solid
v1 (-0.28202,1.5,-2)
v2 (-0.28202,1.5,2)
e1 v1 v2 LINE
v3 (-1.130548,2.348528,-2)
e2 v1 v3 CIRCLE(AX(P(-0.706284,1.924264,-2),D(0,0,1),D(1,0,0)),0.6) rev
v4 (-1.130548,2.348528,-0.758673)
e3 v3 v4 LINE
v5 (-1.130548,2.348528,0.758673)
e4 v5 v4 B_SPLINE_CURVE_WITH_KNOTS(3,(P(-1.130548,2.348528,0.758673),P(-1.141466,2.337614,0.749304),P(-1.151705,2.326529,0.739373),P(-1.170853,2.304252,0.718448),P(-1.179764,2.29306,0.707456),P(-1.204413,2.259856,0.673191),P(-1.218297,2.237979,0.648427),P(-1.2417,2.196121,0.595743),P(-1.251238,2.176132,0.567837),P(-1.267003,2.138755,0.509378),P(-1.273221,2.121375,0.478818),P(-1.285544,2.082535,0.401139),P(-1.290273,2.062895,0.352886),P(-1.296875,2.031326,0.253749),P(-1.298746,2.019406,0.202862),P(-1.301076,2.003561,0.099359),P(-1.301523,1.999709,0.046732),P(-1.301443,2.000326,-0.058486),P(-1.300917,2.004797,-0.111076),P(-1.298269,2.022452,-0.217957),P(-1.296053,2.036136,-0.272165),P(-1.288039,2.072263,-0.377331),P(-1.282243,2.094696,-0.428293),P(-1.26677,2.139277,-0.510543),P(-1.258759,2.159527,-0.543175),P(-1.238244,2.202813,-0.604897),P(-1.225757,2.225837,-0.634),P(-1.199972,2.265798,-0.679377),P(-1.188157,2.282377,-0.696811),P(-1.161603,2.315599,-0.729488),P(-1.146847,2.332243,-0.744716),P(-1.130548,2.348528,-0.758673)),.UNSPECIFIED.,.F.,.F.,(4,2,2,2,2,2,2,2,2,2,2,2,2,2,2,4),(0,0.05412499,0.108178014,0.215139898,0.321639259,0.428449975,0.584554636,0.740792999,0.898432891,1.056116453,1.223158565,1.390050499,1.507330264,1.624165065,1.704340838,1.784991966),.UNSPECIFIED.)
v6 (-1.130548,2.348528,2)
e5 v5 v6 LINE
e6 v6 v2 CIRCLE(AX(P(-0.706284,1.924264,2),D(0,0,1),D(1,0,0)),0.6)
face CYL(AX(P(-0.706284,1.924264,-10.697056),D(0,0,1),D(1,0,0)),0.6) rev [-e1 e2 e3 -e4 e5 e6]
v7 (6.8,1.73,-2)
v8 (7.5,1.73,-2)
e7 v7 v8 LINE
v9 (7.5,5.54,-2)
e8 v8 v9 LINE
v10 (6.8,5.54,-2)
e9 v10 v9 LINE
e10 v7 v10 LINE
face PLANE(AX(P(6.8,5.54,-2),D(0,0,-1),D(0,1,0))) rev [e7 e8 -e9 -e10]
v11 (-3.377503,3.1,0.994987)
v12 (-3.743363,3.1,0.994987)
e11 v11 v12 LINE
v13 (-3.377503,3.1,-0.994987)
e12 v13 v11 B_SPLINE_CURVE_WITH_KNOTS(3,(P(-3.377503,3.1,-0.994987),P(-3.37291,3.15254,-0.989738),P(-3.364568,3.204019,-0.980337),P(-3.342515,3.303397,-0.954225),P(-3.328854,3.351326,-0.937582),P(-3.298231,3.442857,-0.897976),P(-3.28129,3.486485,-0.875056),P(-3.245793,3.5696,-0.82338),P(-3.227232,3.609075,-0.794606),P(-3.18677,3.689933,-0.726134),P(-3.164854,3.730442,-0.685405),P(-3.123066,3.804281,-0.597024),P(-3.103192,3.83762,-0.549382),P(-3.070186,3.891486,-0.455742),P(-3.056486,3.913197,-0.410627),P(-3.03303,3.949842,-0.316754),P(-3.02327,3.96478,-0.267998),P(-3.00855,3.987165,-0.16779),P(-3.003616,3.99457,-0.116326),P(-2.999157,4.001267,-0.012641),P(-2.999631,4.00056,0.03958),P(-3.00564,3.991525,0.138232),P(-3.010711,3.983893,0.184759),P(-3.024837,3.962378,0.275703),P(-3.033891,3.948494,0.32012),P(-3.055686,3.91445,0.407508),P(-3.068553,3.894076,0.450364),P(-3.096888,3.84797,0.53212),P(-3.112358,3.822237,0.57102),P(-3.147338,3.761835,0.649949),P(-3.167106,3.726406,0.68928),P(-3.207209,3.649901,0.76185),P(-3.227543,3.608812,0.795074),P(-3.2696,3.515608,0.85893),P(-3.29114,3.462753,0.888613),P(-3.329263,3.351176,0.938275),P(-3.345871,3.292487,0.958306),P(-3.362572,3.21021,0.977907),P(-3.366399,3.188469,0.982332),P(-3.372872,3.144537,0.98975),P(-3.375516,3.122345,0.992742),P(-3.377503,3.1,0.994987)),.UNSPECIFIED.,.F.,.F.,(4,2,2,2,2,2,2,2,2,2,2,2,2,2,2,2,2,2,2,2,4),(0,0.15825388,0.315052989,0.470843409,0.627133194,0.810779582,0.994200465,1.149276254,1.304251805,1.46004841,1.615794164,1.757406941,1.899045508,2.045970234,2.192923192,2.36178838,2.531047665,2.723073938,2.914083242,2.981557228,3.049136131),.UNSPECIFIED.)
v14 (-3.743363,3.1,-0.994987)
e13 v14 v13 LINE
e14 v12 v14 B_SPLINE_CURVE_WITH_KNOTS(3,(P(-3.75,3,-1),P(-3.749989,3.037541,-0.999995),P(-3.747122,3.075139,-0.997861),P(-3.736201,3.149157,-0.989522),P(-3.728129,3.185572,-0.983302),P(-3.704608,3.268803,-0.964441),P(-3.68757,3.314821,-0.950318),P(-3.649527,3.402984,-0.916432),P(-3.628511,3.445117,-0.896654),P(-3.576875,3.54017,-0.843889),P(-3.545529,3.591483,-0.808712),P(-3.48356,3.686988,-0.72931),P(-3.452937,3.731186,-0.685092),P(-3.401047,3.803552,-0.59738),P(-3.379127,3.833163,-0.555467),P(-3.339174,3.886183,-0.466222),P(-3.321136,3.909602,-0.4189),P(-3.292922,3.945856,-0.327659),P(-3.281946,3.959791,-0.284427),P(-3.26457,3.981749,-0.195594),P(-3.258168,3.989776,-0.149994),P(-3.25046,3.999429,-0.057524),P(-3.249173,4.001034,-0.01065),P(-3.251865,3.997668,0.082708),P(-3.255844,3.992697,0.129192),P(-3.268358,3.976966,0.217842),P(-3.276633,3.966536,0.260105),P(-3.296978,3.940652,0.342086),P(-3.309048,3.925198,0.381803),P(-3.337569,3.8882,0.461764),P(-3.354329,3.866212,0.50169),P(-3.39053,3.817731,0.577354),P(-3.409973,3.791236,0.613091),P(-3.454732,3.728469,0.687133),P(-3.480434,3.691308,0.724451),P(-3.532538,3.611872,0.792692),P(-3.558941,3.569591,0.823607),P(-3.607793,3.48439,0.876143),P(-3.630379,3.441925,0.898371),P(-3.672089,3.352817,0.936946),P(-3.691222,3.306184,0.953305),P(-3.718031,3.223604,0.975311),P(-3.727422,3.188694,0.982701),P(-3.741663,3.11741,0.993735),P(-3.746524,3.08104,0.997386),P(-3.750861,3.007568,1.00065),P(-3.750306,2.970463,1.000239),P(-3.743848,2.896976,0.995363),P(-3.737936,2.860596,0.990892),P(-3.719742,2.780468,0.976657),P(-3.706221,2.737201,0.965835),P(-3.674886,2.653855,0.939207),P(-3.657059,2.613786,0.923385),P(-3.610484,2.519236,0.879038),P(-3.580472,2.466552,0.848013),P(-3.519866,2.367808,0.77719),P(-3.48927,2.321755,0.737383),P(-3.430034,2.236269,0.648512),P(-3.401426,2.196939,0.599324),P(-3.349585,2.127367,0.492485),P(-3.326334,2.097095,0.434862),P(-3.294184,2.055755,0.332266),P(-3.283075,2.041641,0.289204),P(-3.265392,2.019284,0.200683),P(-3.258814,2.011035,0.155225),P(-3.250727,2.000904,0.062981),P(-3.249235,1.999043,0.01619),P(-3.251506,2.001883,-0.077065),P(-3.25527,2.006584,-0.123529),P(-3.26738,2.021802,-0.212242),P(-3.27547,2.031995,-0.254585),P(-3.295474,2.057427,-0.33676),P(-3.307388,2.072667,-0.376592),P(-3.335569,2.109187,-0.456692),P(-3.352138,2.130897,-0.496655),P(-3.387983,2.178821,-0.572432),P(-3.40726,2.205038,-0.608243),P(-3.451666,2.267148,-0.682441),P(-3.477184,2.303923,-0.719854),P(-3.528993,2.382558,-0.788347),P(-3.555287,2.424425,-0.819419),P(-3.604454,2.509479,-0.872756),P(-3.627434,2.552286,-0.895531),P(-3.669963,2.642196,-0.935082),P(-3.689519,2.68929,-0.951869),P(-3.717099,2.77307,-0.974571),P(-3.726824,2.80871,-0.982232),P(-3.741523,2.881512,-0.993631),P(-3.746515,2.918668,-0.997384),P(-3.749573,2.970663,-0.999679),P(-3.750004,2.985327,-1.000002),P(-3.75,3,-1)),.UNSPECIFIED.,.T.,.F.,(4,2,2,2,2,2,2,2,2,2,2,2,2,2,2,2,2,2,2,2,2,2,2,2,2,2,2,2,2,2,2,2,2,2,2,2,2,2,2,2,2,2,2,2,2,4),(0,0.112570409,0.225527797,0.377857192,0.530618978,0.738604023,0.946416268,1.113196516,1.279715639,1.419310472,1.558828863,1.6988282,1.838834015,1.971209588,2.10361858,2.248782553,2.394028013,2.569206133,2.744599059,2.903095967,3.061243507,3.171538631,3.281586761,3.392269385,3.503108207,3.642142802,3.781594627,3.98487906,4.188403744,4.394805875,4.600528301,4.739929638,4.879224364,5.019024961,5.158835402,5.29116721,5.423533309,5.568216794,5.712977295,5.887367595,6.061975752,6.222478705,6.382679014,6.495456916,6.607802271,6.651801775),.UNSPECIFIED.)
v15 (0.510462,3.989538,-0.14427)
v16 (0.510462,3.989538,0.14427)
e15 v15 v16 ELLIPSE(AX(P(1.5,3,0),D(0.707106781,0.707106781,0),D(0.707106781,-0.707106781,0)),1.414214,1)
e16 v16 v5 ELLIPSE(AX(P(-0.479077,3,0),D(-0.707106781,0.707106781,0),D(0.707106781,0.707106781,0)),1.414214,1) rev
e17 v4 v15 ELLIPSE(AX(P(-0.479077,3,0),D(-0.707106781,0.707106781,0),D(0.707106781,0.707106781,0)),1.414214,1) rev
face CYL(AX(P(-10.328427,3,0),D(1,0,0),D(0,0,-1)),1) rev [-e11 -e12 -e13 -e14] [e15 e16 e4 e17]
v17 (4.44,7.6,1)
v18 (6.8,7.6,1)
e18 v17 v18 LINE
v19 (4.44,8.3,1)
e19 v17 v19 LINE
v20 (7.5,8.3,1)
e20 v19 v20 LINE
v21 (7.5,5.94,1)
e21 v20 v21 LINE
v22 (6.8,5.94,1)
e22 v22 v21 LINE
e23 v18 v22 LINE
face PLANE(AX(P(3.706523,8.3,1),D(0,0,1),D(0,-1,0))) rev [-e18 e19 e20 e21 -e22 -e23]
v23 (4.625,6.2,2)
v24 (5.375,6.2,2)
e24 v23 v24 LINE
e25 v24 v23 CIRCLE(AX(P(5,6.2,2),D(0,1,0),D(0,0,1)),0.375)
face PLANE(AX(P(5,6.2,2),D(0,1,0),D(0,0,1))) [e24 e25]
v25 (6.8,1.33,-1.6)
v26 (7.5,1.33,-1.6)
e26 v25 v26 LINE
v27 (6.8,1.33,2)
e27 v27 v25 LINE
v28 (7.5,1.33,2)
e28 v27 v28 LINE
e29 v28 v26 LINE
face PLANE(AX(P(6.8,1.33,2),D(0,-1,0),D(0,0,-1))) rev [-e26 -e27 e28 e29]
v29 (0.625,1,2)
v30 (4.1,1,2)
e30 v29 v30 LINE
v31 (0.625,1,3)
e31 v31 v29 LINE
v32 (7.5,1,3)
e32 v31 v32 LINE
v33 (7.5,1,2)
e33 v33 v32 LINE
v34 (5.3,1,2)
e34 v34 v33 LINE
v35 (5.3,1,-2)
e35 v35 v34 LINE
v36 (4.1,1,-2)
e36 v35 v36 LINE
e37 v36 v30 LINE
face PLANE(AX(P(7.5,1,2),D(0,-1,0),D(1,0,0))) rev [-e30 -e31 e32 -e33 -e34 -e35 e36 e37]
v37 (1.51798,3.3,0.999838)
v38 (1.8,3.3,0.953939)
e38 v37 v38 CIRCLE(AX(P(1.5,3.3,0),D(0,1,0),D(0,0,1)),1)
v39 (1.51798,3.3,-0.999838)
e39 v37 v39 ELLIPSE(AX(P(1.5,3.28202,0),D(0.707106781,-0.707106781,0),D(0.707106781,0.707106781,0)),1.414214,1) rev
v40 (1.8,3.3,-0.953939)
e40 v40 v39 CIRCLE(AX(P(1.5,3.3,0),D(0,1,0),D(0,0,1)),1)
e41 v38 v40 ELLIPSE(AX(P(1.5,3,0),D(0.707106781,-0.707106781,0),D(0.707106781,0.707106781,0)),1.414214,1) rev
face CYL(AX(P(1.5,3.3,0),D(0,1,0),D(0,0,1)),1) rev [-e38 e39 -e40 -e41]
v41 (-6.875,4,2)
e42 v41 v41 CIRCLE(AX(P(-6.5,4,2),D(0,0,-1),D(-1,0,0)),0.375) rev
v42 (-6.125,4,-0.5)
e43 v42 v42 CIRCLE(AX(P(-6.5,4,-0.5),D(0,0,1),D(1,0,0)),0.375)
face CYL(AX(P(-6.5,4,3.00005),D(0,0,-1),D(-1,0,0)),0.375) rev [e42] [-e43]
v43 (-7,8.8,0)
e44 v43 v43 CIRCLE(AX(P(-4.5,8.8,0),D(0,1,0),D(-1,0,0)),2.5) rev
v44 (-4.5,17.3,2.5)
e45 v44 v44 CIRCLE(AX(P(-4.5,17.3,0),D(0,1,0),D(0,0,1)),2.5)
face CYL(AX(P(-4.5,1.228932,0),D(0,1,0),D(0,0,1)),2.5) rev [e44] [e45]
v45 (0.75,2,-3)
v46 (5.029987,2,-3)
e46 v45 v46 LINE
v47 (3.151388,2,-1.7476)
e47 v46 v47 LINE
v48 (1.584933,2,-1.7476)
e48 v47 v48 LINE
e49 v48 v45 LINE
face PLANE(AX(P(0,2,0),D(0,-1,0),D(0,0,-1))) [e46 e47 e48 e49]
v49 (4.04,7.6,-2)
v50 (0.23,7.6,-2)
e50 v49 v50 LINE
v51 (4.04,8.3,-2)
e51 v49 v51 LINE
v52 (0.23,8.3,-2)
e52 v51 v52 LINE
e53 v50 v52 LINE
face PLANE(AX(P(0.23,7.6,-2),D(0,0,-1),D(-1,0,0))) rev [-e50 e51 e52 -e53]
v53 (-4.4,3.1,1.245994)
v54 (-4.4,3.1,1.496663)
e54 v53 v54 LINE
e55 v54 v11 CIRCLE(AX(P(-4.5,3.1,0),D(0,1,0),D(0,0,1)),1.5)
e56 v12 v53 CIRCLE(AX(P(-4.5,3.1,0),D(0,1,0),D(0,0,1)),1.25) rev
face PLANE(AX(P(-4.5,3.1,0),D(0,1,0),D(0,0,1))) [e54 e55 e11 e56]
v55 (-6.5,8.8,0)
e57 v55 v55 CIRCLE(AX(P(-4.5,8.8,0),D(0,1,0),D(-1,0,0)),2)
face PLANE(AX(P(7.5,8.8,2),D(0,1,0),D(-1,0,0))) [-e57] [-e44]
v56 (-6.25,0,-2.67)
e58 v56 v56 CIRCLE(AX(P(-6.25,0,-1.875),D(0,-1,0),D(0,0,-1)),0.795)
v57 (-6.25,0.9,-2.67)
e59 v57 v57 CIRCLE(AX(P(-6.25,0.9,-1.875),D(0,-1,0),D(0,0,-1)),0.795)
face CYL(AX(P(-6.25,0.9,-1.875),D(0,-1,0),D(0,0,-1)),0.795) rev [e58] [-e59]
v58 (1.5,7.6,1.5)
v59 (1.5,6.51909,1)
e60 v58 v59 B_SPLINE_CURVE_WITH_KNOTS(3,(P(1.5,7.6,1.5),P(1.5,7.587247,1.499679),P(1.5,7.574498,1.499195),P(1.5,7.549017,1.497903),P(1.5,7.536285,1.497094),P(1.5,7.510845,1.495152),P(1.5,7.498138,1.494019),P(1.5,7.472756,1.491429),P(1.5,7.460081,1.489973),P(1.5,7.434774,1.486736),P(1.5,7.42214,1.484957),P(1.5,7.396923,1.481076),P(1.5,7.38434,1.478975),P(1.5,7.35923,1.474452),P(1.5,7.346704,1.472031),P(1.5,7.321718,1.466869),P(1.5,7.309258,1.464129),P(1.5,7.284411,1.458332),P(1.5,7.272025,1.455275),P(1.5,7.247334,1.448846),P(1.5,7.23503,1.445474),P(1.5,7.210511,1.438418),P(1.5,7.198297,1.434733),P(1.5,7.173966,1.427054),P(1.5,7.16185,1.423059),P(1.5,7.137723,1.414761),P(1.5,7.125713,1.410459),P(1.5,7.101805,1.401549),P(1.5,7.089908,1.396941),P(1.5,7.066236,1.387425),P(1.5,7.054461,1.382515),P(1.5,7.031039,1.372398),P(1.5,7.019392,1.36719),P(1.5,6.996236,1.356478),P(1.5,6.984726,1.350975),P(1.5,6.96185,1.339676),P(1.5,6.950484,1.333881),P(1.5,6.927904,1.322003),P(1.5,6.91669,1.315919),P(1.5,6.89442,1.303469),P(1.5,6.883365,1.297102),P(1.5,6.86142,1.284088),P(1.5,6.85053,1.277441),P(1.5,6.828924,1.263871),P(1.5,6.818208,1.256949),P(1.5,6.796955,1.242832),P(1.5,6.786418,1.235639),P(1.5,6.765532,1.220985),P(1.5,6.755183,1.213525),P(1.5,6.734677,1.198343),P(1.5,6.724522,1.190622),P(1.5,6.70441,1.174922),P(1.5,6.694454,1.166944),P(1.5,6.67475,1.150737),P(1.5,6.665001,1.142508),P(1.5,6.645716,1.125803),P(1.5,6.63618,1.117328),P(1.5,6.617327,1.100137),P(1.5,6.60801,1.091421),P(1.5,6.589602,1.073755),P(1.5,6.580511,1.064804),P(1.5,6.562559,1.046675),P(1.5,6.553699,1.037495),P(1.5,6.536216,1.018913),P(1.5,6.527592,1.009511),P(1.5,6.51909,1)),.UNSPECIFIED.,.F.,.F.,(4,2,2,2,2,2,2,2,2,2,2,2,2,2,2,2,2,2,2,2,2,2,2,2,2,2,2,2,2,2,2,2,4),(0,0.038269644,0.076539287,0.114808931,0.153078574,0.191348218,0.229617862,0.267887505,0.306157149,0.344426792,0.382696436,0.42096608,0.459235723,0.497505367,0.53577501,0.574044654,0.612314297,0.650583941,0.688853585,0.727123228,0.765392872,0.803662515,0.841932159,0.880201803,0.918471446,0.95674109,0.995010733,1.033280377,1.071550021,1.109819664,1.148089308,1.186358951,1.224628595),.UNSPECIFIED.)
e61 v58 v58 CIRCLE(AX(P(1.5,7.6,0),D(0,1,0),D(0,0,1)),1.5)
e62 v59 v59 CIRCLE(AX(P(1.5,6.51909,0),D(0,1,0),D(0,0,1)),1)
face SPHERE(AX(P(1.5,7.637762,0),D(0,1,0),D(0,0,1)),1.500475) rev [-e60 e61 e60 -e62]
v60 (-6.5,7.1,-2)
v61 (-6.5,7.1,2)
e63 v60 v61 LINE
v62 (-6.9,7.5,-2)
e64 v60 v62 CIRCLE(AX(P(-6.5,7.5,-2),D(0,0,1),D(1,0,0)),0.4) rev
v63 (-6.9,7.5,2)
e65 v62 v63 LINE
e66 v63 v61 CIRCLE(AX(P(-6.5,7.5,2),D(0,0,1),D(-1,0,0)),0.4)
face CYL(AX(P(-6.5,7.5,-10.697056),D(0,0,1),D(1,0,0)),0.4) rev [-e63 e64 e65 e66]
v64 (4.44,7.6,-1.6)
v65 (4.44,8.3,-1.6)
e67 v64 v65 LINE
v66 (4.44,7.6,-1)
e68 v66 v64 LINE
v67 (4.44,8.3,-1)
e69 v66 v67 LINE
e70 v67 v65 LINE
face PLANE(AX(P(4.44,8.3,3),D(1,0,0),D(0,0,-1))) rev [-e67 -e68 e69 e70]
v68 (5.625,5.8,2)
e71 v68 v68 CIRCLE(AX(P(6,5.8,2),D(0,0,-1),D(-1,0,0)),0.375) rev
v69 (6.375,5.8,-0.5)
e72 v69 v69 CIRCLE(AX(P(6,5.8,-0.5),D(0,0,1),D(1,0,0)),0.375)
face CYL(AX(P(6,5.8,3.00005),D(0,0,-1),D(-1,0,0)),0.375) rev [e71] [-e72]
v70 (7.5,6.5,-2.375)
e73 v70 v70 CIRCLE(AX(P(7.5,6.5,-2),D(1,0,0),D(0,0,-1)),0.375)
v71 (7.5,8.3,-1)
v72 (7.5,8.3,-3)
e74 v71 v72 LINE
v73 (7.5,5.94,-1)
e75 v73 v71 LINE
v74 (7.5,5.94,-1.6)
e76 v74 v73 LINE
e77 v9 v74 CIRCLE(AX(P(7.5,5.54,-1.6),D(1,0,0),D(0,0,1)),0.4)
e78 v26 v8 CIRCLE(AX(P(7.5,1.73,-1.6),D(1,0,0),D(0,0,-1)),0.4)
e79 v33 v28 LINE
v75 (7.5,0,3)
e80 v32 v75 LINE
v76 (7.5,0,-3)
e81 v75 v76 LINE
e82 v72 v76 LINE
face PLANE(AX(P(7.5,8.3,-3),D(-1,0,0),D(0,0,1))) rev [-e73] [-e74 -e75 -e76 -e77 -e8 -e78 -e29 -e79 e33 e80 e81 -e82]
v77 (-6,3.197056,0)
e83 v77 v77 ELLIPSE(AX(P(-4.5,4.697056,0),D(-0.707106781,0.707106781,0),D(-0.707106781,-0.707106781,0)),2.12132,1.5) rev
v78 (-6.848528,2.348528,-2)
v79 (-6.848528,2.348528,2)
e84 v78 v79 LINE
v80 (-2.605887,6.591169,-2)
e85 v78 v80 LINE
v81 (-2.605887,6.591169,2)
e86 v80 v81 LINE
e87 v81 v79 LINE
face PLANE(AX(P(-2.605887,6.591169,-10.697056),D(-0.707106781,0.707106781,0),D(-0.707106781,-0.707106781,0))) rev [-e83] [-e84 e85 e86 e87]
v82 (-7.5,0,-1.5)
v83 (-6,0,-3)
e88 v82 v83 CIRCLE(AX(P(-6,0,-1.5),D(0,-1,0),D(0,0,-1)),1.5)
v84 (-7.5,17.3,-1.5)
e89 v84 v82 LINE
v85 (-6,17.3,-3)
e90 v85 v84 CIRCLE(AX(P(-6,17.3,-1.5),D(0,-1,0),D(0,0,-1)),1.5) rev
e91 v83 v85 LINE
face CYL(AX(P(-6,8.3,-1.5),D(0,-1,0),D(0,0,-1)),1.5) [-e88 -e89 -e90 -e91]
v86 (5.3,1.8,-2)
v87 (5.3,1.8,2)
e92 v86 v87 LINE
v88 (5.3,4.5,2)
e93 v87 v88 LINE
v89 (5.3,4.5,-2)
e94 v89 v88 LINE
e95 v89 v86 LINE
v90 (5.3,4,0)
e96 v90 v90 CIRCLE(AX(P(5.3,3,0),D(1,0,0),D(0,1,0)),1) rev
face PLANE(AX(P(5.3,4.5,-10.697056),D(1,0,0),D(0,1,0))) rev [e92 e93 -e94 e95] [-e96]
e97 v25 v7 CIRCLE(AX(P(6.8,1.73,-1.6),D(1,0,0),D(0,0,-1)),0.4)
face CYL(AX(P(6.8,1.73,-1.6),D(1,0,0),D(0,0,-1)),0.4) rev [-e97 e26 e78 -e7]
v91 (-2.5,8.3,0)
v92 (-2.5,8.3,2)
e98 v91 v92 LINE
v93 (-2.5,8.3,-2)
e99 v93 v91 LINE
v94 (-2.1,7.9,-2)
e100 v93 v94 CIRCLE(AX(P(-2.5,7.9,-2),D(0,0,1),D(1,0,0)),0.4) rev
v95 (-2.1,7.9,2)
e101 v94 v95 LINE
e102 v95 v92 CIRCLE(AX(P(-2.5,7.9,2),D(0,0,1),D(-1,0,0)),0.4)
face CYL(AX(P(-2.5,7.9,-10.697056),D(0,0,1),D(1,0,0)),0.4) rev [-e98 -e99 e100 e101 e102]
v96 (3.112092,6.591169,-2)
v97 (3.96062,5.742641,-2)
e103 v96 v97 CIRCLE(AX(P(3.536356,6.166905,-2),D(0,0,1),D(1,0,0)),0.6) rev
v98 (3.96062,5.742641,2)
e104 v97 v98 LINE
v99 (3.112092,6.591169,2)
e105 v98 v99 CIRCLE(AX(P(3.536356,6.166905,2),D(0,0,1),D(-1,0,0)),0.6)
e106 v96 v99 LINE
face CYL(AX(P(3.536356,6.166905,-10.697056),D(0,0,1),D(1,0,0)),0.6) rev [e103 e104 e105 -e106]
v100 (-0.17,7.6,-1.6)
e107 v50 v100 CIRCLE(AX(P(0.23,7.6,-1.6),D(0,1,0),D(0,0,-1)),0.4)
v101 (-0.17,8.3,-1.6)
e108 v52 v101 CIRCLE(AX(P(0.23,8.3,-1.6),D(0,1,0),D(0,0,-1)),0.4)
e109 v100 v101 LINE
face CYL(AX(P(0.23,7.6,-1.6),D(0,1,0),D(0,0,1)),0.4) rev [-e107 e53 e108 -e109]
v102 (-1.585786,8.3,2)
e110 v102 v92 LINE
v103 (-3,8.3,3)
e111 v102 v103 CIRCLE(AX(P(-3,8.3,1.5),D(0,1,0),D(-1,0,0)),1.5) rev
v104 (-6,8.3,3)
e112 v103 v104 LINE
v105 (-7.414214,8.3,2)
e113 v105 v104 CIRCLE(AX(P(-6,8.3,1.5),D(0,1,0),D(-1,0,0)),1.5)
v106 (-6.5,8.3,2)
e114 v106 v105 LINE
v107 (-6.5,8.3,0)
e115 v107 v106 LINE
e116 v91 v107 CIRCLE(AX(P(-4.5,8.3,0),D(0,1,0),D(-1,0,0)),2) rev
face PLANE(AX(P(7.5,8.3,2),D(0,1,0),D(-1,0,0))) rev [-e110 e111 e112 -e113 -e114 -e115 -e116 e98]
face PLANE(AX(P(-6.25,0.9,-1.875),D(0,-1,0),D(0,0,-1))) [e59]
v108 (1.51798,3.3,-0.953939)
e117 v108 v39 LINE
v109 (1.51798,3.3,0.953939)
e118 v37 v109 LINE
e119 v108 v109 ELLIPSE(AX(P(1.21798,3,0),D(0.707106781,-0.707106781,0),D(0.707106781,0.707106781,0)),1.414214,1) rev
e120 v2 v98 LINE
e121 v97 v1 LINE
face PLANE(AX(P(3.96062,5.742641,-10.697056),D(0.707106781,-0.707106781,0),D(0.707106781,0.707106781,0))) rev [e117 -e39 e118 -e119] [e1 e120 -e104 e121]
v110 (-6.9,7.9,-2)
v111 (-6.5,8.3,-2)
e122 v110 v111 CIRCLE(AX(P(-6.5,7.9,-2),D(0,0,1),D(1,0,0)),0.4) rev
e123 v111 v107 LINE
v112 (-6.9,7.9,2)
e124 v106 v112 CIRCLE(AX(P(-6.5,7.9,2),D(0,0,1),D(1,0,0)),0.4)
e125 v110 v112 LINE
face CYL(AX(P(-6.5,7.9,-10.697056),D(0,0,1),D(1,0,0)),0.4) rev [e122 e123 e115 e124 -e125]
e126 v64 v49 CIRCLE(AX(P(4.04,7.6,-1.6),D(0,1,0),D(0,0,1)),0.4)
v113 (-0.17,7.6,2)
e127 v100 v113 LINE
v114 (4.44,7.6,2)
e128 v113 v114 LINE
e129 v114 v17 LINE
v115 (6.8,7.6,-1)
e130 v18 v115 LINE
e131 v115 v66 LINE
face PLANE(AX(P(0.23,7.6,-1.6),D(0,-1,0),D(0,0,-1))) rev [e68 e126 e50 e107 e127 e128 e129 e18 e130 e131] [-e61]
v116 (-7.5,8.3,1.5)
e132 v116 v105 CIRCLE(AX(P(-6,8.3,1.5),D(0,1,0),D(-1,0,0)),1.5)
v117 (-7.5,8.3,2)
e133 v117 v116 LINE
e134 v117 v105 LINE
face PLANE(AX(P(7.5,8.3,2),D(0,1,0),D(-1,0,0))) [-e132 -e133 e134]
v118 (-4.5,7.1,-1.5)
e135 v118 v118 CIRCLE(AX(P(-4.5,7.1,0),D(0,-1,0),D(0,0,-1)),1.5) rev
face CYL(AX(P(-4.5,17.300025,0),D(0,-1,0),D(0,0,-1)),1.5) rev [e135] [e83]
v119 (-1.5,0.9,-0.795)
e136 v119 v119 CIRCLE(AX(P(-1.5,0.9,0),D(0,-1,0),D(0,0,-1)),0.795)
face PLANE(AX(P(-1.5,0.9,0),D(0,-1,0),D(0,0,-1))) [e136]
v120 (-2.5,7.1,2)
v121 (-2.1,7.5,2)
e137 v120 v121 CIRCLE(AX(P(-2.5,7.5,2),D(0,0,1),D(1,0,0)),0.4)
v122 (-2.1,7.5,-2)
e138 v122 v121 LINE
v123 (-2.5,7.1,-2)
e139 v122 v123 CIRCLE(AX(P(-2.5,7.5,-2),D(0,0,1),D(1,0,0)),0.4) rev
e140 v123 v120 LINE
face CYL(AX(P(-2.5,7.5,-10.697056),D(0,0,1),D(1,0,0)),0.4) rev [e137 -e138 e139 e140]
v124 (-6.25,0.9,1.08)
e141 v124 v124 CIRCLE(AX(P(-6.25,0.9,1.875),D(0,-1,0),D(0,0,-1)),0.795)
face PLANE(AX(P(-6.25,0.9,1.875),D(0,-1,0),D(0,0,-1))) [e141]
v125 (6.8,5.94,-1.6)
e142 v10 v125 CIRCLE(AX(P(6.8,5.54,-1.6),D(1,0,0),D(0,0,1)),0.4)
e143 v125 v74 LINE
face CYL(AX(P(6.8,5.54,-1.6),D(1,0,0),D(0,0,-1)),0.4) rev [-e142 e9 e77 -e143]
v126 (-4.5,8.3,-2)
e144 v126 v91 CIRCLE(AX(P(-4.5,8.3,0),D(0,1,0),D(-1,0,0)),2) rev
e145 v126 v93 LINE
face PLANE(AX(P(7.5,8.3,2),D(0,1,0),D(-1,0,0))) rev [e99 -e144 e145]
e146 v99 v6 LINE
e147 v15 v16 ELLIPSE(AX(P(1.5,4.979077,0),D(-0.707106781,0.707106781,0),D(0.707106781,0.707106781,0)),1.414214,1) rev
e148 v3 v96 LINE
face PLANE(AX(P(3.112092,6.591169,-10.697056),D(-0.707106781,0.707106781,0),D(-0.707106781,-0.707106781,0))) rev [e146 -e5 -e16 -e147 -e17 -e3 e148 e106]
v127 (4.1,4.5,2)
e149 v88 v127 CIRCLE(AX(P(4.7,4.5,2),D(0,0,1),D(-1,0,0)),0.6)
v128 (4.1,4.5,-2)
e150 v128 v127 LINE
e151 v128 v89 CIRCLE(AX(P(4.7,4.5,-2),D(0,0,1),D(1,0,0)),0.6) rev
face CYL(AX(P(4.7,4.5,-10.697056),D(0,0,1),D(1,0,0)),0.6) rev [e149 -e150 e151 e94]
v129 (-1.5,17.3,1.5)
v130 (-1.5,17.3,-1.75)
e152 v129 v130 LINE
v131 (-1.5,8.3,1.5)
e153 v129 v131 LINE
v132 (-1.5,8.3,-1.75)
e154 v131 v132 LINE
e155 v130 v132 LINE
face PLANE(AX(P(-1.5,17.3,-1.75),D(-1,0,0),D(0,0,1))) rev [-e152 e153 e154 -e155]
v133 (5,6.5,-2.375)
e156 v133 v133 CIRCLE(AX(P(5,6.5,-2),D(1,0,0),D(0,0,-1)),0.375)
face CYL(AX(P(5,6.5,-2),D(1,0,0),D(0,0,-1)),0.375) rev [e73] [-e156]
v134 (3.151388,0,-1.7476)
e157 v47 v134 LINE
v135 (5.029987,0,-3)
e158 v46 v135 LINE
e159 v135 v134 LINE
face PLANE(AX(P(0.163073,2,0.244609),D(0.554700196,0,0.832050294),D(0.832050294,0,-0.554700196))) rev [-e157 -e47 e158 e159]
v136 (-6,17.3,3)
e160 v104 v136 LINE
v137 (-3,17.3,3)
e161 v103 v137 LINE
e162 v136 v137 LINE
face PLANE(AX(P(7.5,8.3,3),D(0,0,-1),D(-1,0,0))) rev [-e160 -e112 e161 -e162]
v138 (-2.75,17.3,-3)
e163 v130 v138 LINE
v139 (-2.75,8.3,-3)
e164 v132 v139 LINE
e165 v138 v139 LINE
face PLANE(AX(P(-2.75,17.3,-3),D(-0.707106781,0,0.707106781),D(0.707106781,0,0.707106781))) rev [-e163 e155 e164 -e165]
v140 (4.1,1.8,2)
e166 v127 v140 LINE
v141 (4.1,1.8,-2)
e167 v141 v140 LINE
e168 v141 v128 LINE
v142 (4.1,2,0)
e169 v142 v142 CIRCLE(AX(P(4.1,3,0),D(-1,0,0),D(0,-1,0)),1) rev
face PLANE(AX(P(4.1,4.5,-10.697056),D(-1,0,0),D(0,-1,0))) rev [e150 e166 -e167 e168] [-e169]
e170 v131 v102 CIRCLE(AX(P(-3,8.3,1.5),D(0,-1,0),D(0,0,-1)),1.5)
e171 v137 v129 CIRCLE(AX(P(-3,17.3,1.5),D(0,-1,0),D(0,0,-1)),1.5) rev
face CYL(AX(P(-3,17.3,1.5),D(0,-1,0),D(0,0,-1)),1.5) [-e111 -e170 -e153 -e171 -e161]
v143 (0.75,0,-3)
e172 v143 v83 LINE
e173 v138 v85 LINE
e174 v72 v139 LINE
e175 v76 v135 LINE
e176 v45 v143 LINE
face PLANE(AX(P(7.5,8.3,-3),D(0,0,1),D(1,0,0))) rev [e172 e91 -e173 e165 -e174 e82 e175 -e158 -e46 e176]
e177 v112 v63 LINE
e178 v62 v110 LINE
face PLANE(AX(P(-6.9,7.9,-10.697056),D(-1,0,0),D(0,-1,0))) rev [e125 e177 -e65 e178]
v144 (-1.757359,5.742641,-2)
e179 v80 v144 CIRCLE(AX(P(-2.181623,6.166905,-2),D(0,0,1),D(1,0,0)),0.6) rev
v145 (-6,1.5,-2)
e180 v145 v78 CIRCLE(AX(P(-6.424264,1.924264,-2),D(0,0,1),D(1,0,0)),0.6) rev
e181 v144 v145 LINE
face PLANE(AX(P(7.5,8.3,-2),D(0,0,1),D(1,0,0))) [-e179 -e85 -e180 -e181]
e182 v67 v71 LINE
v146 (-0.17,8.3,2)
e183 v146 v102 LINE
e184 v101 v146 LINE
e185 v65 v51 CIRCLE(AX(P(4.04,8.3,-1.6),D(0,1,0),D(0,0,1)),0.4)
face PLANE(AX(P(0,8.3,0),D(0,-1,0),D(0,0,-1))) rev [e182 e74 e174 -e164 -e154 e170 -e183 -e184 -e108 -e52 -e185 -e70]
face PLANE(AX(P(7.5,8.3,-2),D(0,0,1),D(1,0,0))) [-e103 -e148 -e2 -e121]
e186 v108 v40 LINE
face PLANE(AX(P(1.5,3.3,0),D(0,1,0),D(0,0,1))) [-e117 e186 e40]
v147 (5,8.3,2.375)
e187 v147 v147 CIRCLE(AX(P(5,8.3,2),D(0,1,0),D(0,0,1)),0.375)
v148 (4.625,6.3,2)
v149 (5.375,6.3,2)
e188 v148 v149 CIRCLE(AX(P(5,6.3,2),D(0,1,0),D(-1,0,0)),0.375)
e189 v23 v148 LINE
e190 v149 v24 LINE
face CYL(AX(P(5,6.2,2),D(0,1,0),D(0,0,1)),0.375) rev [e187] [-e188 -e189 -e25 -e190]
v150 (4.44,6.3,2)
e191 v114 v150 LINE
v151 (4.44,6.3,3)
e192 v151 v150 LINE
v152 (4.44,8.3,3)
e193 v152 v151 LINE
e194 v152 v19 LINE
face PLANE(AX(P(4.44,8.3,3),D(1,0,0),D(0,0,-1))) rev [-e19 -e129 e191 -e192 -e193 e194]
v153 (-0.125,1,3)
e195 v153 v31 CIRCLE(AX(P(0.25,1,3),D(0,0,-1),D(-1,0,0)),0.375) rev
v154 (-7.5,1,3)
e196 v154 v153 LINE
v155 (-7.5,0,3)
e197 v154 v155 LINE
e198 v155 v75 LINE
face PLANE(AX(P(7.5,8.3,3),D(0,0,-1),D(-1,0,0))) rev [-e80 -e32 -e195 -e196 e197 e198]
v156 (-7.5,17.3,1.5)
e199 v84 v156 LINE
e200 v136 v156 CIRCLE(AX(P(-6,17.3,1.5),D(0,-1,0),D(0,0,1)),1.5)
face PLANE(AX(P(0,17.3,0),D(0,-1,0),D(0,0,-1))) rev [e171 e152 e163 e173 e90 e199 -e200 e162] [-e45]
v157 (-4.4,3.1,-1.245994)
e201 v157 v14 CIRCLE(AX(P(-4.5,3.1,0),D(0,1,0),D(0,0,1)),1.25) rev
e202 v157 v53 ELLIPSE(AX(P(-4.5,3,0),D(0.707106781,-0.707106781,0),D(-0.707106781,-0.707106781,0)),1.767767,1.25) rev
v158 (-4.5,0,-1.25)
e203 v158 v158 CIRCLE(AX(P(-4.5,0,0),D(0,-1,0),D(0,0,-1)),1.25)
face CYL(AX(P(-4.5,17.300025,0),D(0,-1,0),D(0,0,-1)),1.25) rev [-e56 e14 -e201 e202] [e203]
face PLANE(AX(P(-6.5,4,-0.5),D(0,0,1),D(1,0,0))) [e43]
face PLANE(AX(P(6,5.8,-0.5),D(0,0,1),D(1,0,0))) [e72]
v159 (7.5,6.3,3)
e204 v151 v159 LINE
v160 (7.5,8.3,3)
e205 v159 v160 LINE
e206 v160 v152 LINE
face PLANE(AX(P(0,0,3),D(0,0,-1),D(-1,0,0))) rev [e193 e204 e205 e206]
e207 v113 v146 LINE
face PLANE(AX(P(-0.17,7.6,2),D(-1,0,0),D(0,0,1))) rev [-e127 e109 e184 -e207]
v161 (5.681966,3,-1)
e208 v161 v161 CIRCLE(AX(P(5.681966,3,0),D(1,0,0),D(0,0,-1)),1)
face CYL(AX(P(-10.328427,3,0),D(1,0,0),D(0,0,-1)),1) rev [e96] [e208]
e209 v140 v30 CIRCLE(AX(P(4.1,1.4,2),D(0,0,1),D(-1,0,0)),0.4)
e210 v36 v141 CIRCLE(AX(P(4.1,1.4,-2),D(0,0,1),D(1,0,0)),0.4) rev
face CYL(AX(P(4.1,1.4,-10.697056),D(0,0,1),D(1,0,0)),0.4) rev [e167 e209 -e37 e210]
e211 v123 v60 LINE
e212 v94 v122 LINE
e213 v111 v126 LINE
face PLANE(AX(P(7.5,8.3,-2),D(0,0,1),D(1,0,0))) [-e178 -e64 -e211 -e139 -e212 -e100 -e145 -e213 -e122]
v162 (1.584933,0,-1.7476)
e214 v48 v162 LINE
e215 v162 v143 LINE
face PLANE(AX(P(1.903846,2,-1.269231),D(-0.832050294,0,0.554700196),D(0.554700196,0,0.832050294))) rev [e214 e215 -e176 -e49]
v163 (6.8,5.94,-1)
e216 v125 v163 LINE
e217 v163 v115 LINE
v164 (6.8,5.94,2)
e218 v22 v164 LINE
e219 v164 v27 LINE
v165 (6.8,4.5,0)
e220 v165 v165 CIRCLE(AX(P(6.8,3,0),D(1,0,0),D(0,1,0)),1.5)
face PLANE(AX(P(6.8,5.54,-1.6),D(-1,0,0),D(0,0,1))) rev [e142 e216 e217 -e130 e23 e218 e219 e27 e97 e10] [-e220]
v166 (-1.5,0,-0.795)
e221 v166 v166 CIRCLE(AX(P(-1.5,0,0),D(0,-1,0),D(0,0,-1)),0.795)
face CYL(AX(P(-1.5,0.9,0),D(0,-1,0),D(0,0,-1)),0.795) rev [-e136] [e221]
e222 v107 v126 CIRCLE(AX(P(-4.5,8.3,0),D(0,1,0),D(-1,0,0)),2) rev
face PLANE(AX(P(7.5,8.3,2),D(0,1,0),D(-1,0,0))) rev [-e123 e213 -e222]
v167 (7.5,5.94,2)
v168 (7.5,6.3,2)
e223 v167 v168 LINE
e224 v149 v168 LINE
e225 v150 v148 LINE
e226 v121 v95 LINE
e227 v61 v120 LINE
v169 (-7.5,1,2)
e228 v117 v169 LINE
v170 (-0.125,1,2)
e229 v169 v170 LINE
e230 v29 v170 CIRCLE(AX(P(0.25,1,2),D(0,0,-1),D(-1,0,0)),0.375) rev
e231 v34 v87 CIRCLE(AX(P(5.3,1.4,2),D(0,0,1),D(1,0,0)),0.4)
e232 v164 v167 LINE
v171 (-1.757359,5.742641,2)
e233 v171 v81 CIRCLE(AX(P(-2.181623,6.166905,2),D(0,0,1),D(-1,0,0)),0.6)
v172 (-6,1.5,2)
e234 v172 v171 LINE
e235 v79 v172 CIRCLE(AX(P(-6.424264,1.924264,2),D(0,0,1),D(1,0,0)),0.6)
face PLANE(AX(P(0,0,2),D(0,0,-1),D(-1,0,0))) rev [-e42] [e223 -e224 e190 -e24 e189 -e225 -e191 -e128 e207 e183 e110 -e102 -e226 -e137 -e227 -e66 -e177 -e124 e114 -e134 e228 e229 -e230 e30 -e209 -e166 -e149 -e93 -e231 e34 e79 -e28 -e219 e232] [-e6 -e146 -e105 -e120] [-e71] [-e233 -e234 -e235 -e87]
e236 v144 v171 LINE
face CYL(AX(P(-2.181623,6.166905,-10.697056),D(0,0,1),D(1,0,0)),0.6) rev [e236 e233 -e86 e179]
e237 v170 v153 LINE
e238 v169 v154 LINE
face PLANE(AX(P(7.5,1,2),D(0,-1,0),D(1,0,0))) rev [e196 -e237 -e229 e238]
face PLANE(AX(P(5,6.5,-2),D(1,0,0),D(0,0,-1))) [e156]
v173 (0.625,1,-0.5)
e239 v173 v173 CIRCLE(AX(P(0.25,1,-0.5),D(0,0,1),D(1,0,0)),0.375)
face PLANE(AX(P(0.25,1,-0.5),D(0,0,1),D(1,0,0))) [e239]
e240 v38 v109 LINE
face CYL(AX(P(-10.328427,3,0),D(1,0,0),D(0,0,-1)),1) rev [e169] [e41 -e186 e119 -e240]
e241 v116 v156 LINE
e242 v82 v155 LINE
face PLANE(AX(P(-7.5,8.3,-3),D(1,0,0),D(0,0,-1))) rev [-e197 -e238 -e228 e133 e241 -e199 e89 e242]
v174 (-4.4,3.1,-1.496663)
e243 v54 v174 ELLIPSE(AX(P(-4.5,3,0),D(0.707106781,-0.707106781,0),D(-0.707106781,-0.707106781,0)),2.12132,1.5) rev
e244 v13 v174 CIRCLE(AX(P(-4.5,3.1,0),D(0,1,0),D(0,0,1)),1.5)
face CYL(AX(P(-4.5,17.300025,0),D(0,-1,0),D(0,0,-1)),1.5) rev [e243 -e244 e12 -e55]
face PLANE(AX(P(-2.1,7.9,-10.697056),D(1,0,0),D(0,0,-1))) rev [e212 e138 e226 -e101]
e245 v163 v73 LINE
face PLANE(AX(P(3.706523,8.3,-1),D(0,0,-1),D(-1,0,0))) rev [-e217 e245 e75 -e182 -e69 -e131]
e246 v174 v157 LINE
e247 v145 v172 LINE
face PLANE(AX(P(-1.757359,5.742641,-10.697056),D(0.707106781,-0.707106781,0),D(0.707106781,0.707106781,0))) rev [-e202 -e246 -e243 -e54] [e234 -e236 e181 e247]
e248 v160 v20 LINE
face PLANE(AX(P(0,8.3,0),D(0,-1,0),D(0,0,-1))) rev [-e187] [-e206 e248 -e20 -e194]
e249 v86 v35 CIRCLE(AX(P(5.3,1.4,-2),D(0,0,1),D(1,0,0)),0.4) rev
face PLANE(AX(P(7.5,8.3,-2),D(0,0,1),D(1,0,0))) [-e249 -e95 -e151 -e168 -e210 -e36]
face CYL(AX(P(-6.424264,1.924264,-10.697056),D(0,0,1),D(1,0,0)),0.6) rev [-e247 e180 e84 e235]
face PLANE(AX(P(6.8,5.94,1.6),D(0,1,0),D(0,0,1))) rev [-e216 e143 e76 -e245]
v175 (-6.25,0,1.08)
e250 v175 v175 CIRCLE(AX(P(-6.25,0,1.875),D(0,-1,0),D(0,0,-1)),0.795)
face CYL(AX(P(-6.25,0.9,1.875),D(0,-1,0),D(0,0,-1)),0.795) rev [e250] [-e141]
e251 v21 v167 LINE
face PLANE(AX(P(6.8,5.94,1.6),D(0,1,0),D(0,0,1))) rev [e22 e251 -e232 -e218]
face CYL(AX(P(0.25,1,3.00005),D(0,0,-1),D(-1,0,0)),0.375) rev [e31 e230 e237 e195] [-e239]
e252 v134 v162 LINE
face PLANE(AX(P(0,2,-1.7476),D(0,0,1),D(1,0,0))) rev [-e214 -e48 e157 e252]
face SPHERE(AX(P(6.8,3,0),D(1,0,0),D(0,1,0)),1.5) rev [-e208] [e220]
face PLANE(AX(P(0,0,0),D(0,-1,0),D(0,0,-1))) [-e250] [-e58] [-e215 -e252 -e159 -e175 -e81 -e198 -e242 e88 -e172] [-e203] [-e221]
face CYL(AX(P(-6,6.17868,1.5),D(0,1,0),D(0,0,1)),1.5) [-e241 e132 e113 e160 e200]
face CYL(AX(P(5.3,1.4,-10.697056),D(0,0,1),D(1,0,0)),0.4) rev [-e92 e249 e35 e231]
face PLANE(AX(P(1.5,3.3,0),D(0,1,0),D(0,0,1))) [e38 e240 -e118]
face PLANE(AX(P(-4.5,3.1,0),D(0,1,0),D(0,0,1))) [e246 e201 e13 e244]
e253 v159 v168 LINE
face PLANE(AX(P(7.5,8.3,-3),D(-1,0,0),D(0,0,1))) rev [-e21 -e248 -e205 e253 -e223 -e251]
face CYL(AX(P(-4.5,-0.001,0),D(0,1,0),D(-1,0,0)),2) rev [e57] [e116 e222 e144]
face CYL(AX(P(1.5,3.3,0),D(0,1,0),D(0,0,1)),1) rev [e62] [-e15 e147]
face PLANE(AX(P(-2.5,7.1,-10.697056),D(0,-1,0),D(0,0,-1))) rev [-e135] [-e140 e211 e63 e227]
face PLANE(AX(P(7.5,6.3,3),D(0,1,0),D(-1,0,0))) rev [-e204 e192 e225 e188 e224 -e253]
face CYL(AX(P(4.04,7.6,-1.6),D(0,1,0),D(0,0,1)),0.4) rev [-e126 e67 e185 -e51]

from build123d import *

# Parameters (mm, degrees)
SKETCH1_W                        = 15
SKETCH1_H                        = 6
MAIN_BODY_EXT_DEPTH              = 8.3
EMISSION_PATH_EXT_DEPTH          = 9
SKETCH3_R                        = 1.25
EMISSION_AND_GRIN_CUT_DEPTH      = 20.092931
SKETCH4_R                        = 1
DRUM_LENS_CUT_DEPTH              = 13
SKETCH41_R                       = 1
ADDTL_LIGHT_SOURCE_DEPTH         = 5
SKETCH5_W                        = 15
SKETCH5_H                        = 7.3
FILTERCOVER_CUT1_DEPTH           = 1
TOP_LED_SCREW_W                  = 3.06
TOP_LED_SCREW_H                  = 2
BOSS_EXTRUDE1_DEPTH              = 1
FILTERSET_CUT2_DEPTH             = 4
SKETCH10_R                       = 2.5
EMISSION_LENS_CUT_DEPTH          = 8.5
SKETCH15_R                       = 0.795
MAGNETS_CUT_DEPTH                = 0.9
SCREW_HOLES_CUT_DEPTH            = 20.507434
SCREW_HOLES_CUT_DEPTH_BACK       = 2.5
SKETCH18_R                       = 0.375
EXTERNAL_FILLET_1_R              = 1.5
VERTICAL_PATH_CUT_DEPTH          = 14.011149
VERTICAL_PATH_CUT_DEPTH_BACK     = 4
SKETCH28_R                       = 1.5
CUT_EXTRUDE_ORIGINAL_LIGHT_DEPTH = 0.7
CUT_EXTRUDE_ADDTL_LIGHT_DEPTH    = 0.7
SKETCH29_R                       = 0.375
SIDE_LED_SCREW_DEPTH             = 2.5
SKETCH32_W                       = 2
SKETCH32_H                       = 2.36
SIDE_WIRE_SLOT_CUT_DEPTH         = 0.7
SKETCH45_W                       = 2.36
SKETCH45_H                       = 2
TOP_LED_SLOT_DEPTH               = 0.7
CUT_EXTRUDE16_DEPTH              = 9
CUT_EXTRUDE17_REACH              = 13.945
SKETCH37_R                       = 2
SKETCH51_R                       = 0.375
TOP_LE_SCREW_DEPTH               = 2.1
CUT_EXTRUDE20_DEPTH              = 2


with BuildPart() as part:
    # Sketch1 → Main Body Ext (new body)
    with BuildSketch(Plane(origin=(0, 0, 0), x_dir=(1, 0, 0), z_dir=(0, 1, 0))):
        Rectangle(SKETCH1_W, SKETCH1_H)
    extrude(amount=MAIN_BODY_EXT_DEPTH)

    # Sketch8 → Emission Path Ext (add)
    with BuildSketch(Plane(origin=(0, 8.3, 0), x_dir=(1, 0, 0), z_dir=(0, 1, 0))):
        Polygon((-2.75, 3), (-1.5, 1.75), (-1.5, -3), (-7.5, -3), (-7.5, 3), align=None)
    extrude(amount=EMISSION_PATH_EXT_DEPTH)

    # Sketch3 → Emission and Grin Cut (cut, through all)
    with BuildSketch(Plane.XZ):
        with Locations(Location((-4.5, 0, 0), (0, 0, 270))):
            Circle(SKETCH3_R)
    extrude(amount=-EMISSION_AND_GRIN_CUT_DEPTH, mode=Mode.SUBTRACT)

    # Sketch4 → Drum Lens Cut (cut)
    with BuildSketch(Plane(origin=(7.5, 0, 0), x_dir=(0, 0, -1), z_dir=(1, 0, 0))):
        with Locations((0, 3)):
            Circle(SKETCH4_R)
    extrude(amount=-DRUM_LENS_CUT_DEPTH, mode=Mode.SUBTRACT)

    # Sketch41 → Addtl Light Source (cut)
    with BuildSketch(Plane(origin=(0, 8.3, 0), x_dir=(1, 0, 0), z_dir=(0, 1, 0))):
        with Locations(Location((1.5, 0, 0), (0, 0, 270))):
            Circle(SKETCH41_R)
    extrude(amount=-ADDTL_LIGHT_SOURCE_DEPTH, mode=Mode.SUBTRACT)

    # Sketch5 → FilterCover Cut1 (cut)
    with BuildSketch(Plane.XY.offset(3)):
        with Locations((0, 4.65)):
            Rectangle(SKETCH5_W, SKETCH5_H)
    extrude(amount=-FILTERCOVER_CUT1_DEPTH, mode=Mode.SUBTRACT)

    # Top-LED-Screw → Boss-Extrude1 (add)
    with BuildSketch(Plane.XY.offset(2)):
        with Locations((5.97, 7.3)):
            Rectangle(TOP_LED_SCREW_W, TOP_LED_SCREW_H)
    extrude(amount=BOSS_EXTRUDE1_DEPTH)

    # Sketch6 → FilterSet Cut2 (cut)
    with BuildSketch(Plane.XY.offset(2)):
        with BuildLine():
            Line((5.3, 4.5), (5.3, 1.8))
            ThreePointArc((5.3, 1.8), (5.7, 1.4), (5.3, 1))
            Line((5.3, 1), (4.1, 1))
            ThreePointArc((4.1, 1), (3.7, 1.4), (4.1, 1.8))
            Line((4.1, 1.8), (4.1, 4.5))
            ThreePointArc((4.1, 4.5), (4.7, 5.1), (5.3, 4.5))
        make_face()
        with BuildLine():
            Line((-6.9, 7.9), (-6.9, 7.5))
            ThreePointArc((-6.9, 7.5), (-6.782843, 7.217157), (-6.5, 7.1))
            Line((-6.5, 7.1), (-2.5, 7.1))
            ThreePointArc((-2.5, 7.1), (-2.217157, 7.217157), (-2.1, 7.5))
            Line((-2.1, 7.5), (-2.1, 7.9))
            ThreePointArc((-2.1, 7.9), (-2.217157, 8.182843), (-2.5, 8.3))
            Line((-2.5, 8.3), (-6.5, 8.3))
            ThreePointArc((-6.5, 8.3), (-6.782843, 8.182843), (-6.9, 7.9))
        make_face()
        with BuildLine():
            Line((-2.605887, 6.591169), (-6.848528, 2.348528))
            ThreePointArc((-6.848528, 2.348528), (-6.848528, 1.5), (-6, 1.5))
            Line((-6, 1.5), (-1.757359, 5.742641))
            ThreePointArc((-1.757359, 5.742641), (-1.757359, 6.591169), (-2.605887, 6.591169))
        make_face()
        with BuildLine():
            Line((3.112092, 6.591169), (-1.130548, 2.348528))
            ThreePointArc((-1.130548, 2.348528), (-1.130548, 1.5), (-0.28202, 1.5))
            Line((-0.28202, 1.5), (3.96062, 5.742641))
            ThreePointArc((3.96062, 5.742641), (3.96062, 6.591169), (3.112092, 6.591169))
        make_face()
    extrude(amount=-FILTERSET_CUT2_DEPTH, mode=Mode.SUBTRACT)

    # Sketch10 → Emission Lens Cut (cut)
    with BuildSketch(Plane(origin=(0, 17.3, 0), x_dir=(1, 0, 0), z_dir=(0, 1, 0))):
        with Locations(Location((-4.5, 0, 0), (0, 0, 270))):
            Circle(SKETCH10_R)
    extrude(amount=-EMISSION_LENS_CUT_DEPTH, mode=Mode.SUBTRACT)

    # Sketch15 → Magnets Cut (cut)
    with BuildSketch(Plane.XZ):
        with Locations(Location((-6.25, -1.875, 0), (0, 0, 270))):
            Circle(SKETCH15_R)
        with Locations(Location((-6.25, 1.875, 0), (0, 0, 270))):
            Circle(SKETCH15_R)
        with Locations(Location((-1.5, 0, 0), (0, 0, 270))):
            Circle(SKETCH15_R)
    extrude(amount=-MAGNETS_CUT_DEPTH, mode=Mode.SUBTRACT)

    # Sketch18 → Screw Holes Cut (cut, two sides: drawn at the far end of the back side and taken through both)
    with BuildSketch(Plane.XY.offset(2).offset(-SCREW_HOLES_CUT_DEPTH_BACK)):
        with Locations(Location((-6.5, 4, 0), (0, 0, 180))):
            Circle(SKETCH18_R)
        with Locations(Location((6, 5.8, 0), (0, 0, 180))):
            Circle(SKETCH18_R)
        with Locations((0.25, 1)):
            Circle(SKETCH18_R)
    extrude(amount=SCREW_HOLES_CUT_DEPTH + SCREW_HOLES_CUT_DEPTH_BACK, mode=Mode.SUBTRACT)

    # External Fillet 1
    # the kernel refuses this fillet: 1.5 mm, written as the material it takes off along each edge
    with BuildSketch(Plane(origin=(-7.5, -3.75, -3), x_dir=(1, 0, 0), z_dir=(0, 1, 0))) as external_fillet_1_piece_1:
        with BuildLine():
            CenterArc((EXTERNAL_FILLET_1_R, -EXTERNAL_FILLET_1_R), EXTERNAL_FILLET_1_R, 90, 90)
            Line((0, -EXTERNAL_FILLET_1_R), (0, 0))
            Line((0, 0), (EXTERNAL_FILLET_1_R, 0))
        make_face()
    extrude(amount=24.8, mode=Mode.SUBTRACT)
    with BuildSketch(Plane(origin=(-1.5, 8.3, 3), x_dir=(0, 0, -1), z_dir=(0, 1, 0))) as external_fillet_1_piece_2:
        with BuildLine():
            CenterArc((EXTERNAL_FILLET_1_R, EXTERNAL_FILLET_1_R), EXTERNAL_FILLET_1_R, 180, 90)
            Line((0, EXTERNAL_FILLET_1_R), (0, 0))
            Line((0, 0), (EXTERNAL_FILLET_1_R, 0))
        make_face()
    extrude(amount=12.75, mode=Mode.SUBTRACT)

    # Sketch28 → Vertical-Path-Cut (cut, two sides: drawn at the far end of the back side and taken through both)
    with BuildSketch(Plane(origin=(0, 7.1, 0), x_dir=(1, 0, 0), z_dir=(0, 1, 0)).offset(-VERTICAL_PATH_CUT_DEPTH_BACK)):
        with Locations(Location((-4.5, 0, 0), (0, 0, 180))):
            Circle(SKETCH28_R)
    extrude(amount=VERTICAL_PATH_CUT_DEPTH + VERTICAL_PATH_CUT_DEPTH_BACK, mode=Mode.SUBTRACT)

    # Sketch12 → Cut-Extrude Original Light (cut)
    with BuildSketch(Plane(origin=(7.5, 0, 0), x_dir=(0, 0, -1), z_dir=(1, 0, 0))):
        with BuildLine():
            Line((1.6, 5.94), (-1.6, 5.94))
            Line((-1.6, 5.94), (-2, 5.94))
            Line((-2, 5.94), (-2, 1.33))
            Line((-2, 1.33), (1.6, 1.33))
            ThreePointArc((1.6, 1.33), (1.882843, 1.447157), (2, 1.73))
            Line((2, 1.73), (2, 5.54))
            ThreePointArc((2, 5.54), (1.882843, 5.822843), (1.6, 5.94))
        make_face()
    extrude(amount=-CUT_EXTRUDE_ORIGINAL_LIGHT_DEPTH, mode=Mode.SUBTRACT)

    # Sketch44 → Cut-Extrude Addtl Light (cut)
    with BuildSketch(Plane(origin=(0, 8.3, 0), x_dir=(1, 0, 0), z_dir=(0, 1, 0))):
        with BuildLine():
            Line((-0.17, -2), (4.44, -2))
            Line((4.44, -2), (4.44, 1.6))
            ThreePointArc((4.44, 1.6), (4.322843, 1.882843), (4.04, 2))
            Line((4.04, 2), (0.23, 2))
            ThreePointArc((0.23, 2), (-0.052843, 1.882843), (-0.17, 1.6))
            Line((-0.17, 1.6), (-0.17, -2))
        make_face()
    extrude(amount=-CUT_EXTRUDE_ADDTL_LIGHT_DEPTH, mode=Mode.SUBTRACT)

    # Sketch29 → Side-LED-Screw (cut)
    with BuildSketch(Plane(origin=(7.5, 0, 0), x_dir=(0, 0, -1), z_dir=(1, 0, 0))):
        with Locations((2, 6.5)):
            Circle(SKETCH29_R)
    extrude(amount=-SIDE_LED_SCREW_DEPTH, mode=Mode.SUBTRACT)

    # Sketch32 → Side-Wire-Slot-Cut (cut)
    with BuildSketch(Plane(origin=(7.5, 0, 0), x_dir=(0, 0, -1), z_dir=(1, 0, 0))):
        with Locations((0, 7.12)):
            Rectangle(SKETCH32_W, SKETCH32_H)
    extrude(amount=-SIDE_WIRE_SLOT_CUT_DEPTH, mode=Mode.SUBTRACT)

    # Sketch45 → Top-LED-slot (cut)
    with BuildSketch(Plane(origin=(0, 8.3, 0), x_dir=(1, 0, 0), z_dir=(0, 1, 0))):
        with Locations((5.62, 0)):
            Rectangle(SKETCH45_W, SKETCH45_H)
    extrude(amount=-TOP_LED_SLOT_DEPTH, mode=Mode.SUBTRACT)

    # Sketch33 → Side-BallLens_Cut (revolve, cut)
    with BuildSketch(Plane.XY, mode=Mode.PRIVATE) as side_balllens_cut_sk:
        with BuildLine():
            Line((6.8, 3), (5.3, 3))
            ThreePointArc((5.3, 3), (5.73934, 4.06066), (6.8, 4.5))
            Line((6.8, 4.5), (6.8, 3))
        make_face()
    revolve(side_balllens_cut_sk.sketch.rotate(Axis((6.8, 3, 0), (-1, 0, 0)), 84.26086), axis=Axis((6.8, 3, 0), (-1, 0, 0)), mode=Mode.SUBTRACT)

    # Sketch47 → Top-BallLens_Cut (revolve, cut)
    with BuildSketch(Plane(origin=(1.5, 0, 0), x_dir=(0, 0, -1), z_dir=(1, 0, 0))):
        with BuildLine():
            Line((-1.5, 7.6), (0, 7.6))
            Line((0, 7.6), (0, 6.137287))
            ThreePointArc((0, 6.137287), (-1.04756, 6.563498), (-1.5, 7.6))
        make_face()
    revolve(axis=Axis((1.5, 7.6, 0), (0, -1, 0)), mode=Mode.SUBTRACT)

    # Sketch36 → Cut-Extrude16 (cut)
    with BuildSketch(Plane(origin=(0, 17.3, 0), x_dir=(1, 0, 0), z_dir=(0, 1, 0))):
        with BuildLine():
            Line((-7.5, -1.5), (-7.5, -3))
            Line((-7.5, -3), (-6, -3))
            ThreePointArc((-6, -3), (-7.06066, -2.56066), (-7.5, -1.5))
        make_face()
    extrude(amount=-CUT_EXTRUDE16_DEPTH, mode=Mode.SUBTRACT)

    # Sketch37 → Cut-Extrude17 (cut, up to next)
    with BuildSketch(Plane(origin=(0, 8.8, 0), x_dir=(1, 0, 0), z_dir=(0, 1, 0)), mode=Mode.PRIVATE) as cut_extrude17_sk1:
        with Locations(Location((-4.5, 0, 0), (0, 0, 180))):
            Circle(SKETCH37_R)
    cut_extrude17_tool1 = extrude(cut_extrude17_sk1.sketch, amount=-CUT_EXTRUDE17_REACH, mode=Mode.PRIVATE) & part.part
    add(cut_extrude17_tool1.solids().sort_by_distance((-4.5, 8.8, 0))[0], mode=Mode.SUBTRACT)

    # Sketch51 → Top-LE-Screw (cut)
    with BuildSketch(Plane(origin=(0, 8.3, 0), x_dir=(1, 0, 0), z_dir=(0, 1, 0))):
        with Locations(Location((5, -2, 0), (0, 0, 270))):
            Circle(SKETCH51_R)
    extrude(amount=-TOP_LE_SCREW_DEPTH, mode=Mode.SUBTRACT)

    # Notch → Cut-Extrude20 (cut)
    with BuildSketch(Plane.XZ):
        Polygon((3.151388, -1.7476), (1.584933, -1.7476), (1.584933, -3), (5.029987, -3), align=None)
        Polygon((1.584933, -3), (1.584933, -1.7476), (0.75, -3), align=None)
    extrude(amount=-CUT_EXTRUDE20_DEPTH, mode=Mode.SUBTRACT)


solid = part.part
